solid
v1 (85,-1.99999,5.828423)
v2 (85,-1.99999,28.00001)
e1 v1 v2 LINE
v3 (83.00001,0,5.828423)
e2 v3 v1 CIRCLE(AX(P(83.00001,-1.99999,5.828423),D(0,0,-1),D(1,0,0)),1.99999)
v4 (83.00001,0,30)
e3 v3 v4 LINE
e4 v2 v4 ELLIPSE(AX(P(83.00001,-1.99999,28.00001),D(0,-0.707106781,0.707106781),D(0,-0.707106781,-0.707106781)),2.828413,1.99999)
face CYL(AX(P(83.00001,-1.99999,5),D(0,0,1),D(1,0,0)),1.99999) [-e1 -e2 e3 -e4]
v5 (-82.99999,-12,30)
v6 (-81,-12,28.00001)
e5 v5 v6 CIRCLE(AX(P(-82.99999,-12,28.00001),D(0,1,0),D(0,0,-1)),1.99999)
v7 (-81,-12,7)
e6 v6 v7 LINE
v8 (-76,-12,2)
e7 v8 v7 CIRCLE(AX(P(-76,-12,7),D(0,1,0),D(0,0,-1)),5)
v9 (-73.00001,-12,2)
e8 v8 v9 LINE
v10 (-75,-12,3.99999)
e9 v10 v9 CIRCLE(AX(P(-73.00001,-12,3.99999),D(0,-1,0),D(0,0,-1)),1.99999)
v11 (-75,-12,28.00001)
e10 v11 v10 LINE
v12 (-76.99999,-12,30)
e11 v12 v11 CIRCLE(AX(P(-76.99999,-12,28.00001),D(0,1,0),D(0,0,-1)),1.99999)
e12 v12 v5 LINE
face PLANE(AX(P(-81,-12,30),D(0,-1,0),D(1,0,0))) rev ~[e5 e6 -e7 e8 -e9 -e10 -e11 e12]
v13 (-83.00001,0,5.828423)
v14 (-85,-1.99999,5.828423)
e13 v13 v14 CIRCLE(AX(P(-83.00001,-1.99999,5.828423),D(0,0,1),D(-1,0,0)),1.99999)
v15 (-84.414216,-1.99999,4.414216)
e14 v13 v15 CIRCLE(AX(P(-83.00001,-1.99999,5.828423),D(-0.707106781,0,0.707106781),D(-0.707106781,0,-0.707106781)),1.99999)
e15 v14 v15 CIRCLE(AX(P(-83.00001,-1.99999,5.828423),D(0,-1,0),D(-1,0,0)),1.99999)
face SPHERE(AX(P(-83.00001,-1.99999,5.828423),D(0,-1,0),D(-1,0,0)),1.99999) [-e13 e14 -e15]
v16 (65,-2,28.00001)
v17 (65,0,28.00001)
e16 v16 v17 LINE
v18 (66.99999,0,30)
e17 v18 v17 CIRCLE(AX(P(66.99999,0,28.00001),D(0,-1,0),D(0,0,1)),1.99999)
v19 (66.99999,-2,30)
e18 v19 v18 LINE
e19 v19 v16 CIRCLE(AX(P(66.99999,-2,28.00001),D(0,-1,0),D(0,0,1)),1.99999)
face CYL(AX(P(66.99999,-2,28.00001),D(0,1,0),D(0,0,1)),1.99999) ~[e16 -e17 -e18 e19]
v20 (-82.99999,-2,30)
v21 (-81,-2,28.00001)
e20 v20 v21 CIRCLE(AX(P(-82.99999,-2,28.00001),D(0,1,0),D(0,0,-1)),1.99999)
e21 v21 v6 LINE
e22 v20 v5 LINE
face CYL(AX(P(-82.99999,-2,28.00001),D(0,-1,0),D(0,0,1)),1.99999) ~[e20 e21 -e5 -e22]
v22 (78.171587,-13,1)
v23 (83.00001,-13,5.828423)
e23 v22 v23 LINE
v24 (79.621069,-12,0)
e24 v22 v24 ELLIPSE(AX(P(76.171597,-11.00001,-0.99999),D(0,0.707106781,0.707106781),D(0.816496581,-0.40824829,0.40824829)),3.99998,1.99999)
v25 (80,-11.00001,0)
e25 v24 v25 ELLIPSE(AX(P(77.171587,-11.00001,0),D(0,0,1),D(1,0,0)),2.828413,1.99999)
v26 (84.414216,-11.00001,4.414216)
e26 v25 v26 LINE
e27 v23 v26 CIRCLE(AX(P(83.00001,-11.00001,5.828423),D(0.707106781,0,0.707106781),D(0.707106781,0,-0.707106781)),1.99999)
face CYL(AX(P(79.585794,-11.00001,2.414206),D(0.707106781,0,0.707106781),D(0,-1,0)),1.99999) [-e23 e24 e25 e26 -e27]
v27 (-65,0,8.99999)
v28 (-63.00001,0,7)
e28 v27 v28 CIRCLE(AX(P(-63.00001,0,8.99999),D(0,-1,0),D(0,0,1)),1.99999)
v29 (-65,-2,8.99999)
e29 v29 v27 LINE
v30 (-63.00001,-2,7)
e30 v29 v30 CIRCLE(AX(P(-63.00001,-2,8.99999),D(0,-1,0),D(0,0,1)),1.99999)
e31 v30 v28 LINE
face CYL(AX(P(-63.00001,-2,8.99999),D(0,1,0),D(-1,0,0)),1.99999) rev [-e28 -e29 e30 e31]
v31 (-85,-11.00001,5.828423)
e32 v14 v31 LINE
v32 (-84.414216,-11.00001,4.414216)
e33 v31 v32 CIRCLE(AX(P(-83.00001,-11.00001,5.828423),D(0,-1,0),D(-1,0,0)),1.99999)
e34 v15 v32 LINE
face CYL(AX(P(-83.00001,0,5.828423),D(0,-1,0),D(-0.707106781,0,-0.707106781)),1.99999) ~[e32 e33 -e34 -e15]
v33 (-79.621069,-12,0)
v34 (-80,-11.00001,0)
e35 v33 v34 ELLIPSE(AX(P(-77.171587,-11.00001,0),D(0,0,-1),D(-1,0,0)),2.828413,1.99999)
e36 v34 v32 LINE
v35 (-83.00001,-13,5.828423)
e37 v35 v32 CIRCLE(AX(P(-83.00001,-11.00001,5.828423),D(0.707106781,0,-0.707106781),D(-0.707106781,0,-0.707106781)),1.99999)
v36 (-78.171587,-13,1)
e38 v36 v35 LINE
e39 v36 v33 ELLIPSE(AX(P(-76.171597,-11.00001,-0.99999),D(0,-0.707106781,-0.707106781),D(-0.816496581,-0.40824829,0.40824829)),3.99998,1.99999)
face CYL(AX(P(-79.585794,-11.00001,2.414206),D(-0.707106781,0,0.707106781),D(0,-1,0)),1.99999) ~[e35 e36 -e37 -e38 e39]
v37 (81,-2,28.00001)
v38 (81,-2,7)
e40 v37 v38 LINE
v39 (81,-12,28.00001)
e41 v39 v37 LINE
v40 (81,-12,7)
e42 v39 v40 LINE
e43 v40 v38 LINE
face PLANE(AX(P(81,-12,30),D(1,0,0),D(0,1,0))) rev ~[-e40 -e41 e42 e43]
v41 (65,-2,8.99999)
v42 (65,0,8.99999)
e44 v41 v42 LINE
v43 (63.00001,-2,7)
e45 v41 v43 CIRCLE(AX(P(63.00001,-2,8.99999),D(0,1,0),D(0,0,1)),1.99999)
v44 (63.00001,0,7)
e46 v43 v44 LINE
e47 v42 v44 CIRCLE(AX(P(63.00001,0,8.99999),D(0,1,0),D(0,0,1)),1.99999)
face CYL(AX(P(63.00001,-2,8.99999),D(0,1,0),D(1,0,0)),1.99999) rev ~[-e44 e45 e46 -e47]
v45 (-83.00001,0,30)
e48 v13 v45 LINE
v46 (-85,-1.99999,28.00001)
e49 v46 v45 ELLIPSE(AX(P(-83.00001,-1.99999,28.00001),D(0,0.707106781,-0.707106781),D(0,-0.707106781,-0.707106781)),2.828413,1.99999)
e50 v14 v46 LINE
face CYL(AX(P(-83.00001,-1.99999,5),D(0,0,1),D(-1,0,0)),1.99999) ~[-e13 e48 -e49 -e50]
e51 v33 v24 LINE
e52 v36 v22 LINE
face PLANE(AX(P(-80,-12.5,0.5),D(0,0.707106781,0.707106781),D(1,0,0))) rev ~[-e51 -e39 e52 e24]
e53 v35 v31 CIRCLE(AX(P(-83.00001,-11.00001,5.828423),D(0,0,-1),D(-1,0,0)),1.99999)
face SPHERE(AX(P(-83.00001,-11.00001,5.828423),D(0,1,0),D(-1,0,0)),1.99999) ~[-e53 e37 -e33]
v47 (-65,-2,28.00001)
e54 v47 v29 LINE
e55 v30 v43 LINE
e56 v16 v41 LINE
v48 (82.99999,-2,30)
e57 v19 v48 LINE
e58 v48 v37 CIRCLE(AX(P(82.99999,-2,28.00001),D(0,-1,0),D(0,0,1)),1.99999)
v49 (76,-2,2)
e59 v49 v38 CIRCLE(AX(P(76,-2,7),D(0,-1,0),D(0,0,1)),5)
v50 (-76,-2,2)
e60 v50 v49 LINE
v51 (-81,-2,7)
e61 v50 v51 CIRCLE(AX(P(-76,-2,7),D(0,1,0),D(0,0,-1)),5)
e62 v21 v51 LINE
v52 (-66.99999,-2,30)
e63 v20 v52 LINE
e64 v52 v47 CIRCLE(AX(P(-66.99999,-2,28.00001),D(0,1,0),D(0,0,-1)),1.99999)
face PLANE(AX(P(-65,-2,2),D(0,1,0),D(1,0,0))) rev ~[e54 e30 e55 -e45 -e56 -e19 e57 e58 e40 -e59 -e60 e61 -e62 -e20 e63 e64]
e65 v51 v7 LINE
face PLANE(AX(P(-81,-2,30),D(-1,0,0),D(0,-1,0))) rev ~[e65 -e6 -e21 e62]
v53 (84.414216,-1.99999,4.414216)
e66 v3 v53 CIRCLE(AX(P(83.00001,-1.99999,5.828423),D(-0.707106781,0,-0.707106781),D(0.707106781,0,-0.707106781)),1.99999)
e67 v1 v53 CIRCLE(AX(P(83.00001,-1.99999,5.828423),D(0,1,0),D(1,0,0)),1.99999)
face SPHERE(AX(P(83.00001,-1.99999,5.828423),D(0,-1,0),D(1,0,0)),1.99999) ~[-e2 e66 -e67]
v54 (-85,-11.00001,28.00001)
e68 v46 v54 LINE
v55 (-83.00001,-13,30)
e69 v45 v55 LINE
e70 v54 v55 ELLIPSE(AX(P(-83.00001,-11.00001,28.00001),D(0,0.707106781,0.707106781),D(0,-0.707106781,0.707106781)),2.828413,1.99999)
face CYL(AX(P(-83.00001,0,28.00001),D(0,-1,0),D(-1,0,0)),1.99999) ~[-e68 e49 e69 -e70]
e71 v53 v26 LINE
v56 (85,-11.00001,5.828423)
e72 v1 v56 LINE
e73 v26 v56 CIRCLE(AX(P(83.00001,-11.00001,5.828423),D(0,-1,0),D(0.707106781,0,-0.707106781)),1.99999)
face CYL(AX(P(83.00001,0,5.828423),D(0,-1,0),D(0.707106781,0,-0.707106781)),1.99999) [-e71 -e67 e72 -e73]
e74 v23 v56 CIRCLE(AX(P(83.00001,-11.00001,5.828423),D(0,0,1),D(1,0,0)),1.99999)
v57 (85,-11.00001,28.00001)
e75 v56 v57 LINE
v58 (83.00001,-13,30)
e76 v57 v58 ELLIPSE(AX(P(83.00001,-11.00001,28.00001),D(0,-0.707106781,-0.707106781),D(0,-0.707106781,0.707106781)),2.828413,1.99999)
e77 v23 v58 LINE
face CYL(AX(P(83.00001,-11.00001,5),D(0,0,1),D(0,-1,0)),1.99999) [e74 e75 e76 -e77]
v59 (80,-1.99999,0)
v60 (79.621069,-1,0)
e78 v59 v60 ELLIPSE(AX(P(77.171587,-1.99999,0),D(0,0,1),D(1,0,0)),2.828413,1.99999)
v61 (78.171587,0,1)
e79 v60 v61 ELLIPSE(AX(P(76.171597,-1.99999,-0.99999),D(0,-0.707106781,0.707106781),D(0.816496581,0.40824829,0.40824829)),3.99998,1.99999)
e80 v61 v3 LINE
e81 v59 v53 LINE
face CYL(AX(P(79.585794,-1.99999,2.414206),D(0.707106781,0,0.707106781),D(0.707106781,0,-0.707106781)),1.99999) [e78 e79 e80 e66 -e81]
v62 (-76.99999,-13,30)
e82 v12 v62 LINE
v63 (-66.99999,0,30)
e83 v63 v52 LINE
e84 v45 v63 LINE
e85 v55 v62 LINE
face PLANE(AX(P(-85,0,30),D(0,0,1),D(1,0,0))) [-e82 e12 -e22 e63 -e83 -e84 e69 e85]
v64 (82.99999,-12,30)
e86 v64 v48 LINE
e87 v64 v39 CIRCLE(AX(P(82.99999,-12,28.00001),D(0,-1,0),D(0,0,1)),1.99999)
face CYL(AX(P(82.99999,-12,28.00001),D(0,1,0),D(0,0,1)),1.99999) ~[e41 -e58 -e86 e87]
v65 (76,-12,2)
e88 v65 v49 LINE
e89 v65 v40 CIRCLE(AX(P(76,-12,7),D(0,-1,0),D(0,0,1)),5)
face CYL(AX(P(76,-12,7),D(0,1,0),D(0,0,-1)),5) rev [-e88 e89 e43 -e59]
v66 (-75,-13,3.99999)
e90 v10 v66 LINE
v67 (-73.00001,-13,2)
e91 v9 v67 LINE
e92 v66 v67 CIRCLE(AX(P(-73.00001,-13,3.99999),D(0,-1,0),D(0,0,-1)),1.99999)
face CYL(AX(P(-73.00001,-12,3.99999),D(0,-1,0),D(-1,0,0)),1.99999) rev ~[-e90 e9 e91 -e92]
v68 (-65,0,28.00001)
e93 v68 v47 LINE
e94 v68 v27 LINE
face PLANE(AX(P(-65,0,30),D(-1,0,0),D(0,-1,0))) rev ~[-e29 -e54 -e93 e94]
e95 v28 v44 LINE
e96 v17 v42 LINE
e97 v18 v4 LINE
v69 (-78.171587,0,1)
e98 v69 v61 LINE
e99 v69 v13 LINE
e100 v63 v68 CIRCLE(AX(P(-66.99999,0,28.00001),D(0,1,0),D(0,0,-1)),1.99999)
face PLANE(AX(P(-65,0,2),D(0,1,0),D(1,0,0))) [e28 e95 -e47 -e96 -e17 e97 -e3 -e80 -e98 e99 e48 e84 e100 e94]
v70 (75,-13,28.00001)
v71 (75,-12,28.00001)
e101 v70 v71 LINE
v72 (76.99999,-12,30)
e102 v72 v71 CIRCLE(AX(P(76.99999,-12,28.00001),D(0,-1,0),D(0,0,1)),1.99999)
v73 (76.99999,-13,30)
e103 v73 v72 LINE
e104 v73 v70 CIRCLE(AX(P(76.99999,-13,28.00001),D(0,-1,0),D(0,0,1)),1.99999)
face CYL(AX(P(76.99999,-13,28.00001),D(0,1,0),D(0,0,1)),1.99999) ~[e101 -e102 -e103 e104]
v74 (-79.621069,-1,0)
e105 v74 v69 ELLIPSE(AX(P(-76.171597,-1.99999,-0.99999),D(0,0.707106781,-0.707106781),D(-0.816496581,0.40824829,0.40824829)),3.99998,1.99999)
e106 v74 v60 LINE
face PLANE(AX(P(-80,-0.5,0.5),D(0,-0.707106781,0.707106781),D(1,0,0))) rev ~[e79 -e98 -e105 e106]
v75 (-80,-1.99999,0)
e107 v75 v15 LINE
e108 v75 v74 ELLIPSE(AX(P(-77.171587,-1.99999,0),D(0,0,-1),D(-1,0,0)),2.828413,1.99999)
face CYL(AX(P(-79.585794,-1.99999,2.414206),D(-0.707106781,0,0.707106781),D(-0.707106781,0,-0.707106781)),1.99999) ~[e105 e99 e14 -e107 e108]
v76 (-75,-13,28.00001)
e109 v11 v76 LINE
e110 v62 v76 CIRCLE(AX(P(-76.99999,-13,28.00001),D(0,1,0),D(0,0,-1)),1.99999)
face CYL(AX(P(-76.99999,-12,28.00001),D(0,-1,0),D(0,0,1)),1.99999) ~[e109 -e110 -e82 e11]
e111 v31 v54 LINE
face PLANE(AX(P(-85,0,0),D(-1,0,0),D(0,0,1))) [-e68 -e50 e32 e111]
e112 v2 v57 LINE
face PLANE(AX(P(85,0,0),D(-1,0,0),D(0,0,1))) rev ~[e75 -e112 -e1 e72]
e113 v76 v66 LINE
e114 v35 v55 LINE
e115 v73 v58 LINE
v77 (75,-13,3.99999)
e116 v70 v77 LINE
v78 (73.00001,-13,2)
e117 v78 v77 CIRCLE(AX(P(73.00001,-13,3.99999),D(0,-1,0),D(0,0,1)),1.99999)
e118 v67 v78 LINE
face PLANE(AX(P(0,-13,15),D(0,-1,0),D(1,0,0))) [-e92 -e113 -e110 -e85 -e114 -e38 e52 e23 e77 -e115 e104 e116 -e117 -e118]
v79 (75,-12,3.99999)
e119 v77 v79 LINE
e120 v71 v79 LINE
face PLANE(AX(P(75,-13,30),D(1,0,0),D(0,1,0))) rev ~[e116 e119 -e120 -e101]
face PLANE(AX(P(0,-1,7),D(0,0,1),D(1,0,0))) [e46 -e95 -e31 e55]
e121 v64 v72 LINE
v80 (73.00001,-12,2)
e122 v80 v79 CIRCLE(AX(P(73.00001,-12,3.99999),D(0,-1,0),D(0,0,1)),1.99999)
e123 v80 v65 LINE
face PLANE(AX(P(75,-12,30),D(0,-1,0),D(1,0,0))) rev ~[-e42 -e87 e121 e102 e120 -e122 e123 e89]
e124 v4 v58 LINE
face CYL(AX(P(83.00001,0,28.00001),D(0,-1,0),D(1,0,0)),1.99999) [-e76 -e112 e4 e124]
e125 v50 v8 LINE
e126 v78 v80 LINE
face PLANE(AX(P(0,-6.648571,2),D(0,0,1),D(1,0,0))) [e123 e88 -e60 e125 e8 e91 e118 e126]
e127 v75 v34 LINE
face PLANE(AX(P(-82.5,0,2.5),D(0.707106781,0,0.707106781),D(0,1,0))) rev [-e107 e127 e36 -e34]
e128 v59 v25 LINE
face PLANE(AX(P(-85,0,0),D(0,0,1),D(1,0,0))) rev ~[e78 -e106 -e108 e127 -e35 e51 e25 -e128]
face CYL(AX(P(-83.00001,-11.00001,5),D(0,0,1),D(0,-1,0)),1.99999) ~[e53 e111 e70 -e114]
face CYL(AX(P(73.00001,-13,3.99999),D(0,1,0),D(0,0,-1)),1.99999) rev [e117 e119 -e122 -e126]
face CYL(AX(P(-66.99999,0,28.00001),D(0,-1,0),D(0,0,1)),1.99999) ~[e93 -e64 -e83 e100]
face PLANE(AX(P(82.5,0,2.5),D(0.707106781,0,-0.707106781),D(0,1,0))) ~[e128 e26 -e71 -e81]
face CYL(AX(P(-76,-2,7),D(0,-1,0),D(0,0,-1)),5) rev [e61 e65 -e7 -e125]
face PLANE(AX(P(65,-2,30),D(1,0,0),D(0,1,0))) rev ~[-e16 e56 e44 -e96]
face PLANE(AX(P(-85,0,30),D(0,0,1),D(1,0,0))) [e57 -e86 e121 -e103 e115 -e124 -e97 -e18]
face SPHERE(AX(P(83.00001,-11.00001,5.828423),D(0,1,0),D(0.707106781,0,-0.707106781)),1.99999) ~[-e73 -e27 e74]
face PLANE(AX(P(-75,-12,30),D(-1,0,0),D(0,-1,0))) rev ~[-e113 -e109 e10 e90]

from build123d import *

# Parameters (mm, degrees)
F0_W     = 170
F0_H     = 30
F1_DEPTH = 13
F3_DEPTH = 28
F4_W     = 130
F4_H     = 2
F5_DEPTH = 5
F6_SIZE  = 5
F7_R     = 5
F8_SIZE  = 1
F9_R     = 1.99999


# Not quite as in the source:
# - a fillet or chamfer is up to 0.001 mm smaller than in the source, because OpenCascade refuses the exact size


with BuildPart() as f1:
    # F0 (on Front) → F1 (new body)
    with BuildSketch(Plane.XZ):
        with Locations((0, 15)):
            Rectangle(F0_W, F0_H)
    extrude(amount=F1_DEPTH)

    # F2 (on face) → F3 (cut)
    with BuildSketch(Plane.XY.offset(30)):
        Polygon((-65, -2), (-81, -2), (-81, -12), (-75, -12), (-75, -13), (75, -13), (75, -12), (81, -12), (81, -2), (65, -2), (65, 0), (-65, 0), align=None)
    extrude(amount=-F3_DEPTH, mode=Mode.SUBTRACT)

    # F4 (on face) → F5 (join)
    with BuildSketch(Plane.XY.offset(2)):
        with Locations((0, -1)):
            Rectangle(F4_W, F4_H)
    extrude(amount=F5_DEPTH)

    # F6
    f6_edges = [f1.edges().sort_by_distance(p)[0] for p in [
        (85, -6.5, 0),
        (-85, -6.5, 0),
    ]]
    chamfer(f6_edges, length=F6_SIZE)

    # F7
    f7_edges = [f1.edges().sort_by_distance(p)[0] for p in [
        (-81, -7, 2),
        (81, -7, 2),
    ]]
    fillet(f7_edges, radius=F7_R)

    # F8
    f8_edges = [f1.edges().sort_by_distance(p)[0] for p in [
        (0, -13, 0),
        (0, 0, 0),
    ]]
    chamfer(f8_edges, length=F8_SIZE)

    # F9 (radius 2 in the source; OpenCascade refuses exactly that, so slightly less here)
    f9_edges = [f1.edges().sort_by_distance(p)[0] for p in [
        (-85, -6.5, 5),
        (-85, -6.5, 30),
        (-81, -7, 30),
        (81, -7, 30),
        (85, -6.5, 30),
        (85, -6.5, 5),
        (65, -1, 7),
        (65, -1, 30),
        (75, -12.5, 2),
        (75, -12.5, 30),
        (-65, -1, 30),
        (-65, -1, 7),
        (-75, -12.5, 2),
        (-75, -12.5, 30),
        (85, 0, 17.5),
        (83, 0, 3),
        (83, -13, 3),
        (85, -13, 17.5),
        (-85, 0, 17.5),
        (-83, 0, 3),
        (-85, -13, 17.5),
        (-83, -13, 3),
    ]]
    fillet(f9_edges, radius=F9_R)


solid = f1.part
